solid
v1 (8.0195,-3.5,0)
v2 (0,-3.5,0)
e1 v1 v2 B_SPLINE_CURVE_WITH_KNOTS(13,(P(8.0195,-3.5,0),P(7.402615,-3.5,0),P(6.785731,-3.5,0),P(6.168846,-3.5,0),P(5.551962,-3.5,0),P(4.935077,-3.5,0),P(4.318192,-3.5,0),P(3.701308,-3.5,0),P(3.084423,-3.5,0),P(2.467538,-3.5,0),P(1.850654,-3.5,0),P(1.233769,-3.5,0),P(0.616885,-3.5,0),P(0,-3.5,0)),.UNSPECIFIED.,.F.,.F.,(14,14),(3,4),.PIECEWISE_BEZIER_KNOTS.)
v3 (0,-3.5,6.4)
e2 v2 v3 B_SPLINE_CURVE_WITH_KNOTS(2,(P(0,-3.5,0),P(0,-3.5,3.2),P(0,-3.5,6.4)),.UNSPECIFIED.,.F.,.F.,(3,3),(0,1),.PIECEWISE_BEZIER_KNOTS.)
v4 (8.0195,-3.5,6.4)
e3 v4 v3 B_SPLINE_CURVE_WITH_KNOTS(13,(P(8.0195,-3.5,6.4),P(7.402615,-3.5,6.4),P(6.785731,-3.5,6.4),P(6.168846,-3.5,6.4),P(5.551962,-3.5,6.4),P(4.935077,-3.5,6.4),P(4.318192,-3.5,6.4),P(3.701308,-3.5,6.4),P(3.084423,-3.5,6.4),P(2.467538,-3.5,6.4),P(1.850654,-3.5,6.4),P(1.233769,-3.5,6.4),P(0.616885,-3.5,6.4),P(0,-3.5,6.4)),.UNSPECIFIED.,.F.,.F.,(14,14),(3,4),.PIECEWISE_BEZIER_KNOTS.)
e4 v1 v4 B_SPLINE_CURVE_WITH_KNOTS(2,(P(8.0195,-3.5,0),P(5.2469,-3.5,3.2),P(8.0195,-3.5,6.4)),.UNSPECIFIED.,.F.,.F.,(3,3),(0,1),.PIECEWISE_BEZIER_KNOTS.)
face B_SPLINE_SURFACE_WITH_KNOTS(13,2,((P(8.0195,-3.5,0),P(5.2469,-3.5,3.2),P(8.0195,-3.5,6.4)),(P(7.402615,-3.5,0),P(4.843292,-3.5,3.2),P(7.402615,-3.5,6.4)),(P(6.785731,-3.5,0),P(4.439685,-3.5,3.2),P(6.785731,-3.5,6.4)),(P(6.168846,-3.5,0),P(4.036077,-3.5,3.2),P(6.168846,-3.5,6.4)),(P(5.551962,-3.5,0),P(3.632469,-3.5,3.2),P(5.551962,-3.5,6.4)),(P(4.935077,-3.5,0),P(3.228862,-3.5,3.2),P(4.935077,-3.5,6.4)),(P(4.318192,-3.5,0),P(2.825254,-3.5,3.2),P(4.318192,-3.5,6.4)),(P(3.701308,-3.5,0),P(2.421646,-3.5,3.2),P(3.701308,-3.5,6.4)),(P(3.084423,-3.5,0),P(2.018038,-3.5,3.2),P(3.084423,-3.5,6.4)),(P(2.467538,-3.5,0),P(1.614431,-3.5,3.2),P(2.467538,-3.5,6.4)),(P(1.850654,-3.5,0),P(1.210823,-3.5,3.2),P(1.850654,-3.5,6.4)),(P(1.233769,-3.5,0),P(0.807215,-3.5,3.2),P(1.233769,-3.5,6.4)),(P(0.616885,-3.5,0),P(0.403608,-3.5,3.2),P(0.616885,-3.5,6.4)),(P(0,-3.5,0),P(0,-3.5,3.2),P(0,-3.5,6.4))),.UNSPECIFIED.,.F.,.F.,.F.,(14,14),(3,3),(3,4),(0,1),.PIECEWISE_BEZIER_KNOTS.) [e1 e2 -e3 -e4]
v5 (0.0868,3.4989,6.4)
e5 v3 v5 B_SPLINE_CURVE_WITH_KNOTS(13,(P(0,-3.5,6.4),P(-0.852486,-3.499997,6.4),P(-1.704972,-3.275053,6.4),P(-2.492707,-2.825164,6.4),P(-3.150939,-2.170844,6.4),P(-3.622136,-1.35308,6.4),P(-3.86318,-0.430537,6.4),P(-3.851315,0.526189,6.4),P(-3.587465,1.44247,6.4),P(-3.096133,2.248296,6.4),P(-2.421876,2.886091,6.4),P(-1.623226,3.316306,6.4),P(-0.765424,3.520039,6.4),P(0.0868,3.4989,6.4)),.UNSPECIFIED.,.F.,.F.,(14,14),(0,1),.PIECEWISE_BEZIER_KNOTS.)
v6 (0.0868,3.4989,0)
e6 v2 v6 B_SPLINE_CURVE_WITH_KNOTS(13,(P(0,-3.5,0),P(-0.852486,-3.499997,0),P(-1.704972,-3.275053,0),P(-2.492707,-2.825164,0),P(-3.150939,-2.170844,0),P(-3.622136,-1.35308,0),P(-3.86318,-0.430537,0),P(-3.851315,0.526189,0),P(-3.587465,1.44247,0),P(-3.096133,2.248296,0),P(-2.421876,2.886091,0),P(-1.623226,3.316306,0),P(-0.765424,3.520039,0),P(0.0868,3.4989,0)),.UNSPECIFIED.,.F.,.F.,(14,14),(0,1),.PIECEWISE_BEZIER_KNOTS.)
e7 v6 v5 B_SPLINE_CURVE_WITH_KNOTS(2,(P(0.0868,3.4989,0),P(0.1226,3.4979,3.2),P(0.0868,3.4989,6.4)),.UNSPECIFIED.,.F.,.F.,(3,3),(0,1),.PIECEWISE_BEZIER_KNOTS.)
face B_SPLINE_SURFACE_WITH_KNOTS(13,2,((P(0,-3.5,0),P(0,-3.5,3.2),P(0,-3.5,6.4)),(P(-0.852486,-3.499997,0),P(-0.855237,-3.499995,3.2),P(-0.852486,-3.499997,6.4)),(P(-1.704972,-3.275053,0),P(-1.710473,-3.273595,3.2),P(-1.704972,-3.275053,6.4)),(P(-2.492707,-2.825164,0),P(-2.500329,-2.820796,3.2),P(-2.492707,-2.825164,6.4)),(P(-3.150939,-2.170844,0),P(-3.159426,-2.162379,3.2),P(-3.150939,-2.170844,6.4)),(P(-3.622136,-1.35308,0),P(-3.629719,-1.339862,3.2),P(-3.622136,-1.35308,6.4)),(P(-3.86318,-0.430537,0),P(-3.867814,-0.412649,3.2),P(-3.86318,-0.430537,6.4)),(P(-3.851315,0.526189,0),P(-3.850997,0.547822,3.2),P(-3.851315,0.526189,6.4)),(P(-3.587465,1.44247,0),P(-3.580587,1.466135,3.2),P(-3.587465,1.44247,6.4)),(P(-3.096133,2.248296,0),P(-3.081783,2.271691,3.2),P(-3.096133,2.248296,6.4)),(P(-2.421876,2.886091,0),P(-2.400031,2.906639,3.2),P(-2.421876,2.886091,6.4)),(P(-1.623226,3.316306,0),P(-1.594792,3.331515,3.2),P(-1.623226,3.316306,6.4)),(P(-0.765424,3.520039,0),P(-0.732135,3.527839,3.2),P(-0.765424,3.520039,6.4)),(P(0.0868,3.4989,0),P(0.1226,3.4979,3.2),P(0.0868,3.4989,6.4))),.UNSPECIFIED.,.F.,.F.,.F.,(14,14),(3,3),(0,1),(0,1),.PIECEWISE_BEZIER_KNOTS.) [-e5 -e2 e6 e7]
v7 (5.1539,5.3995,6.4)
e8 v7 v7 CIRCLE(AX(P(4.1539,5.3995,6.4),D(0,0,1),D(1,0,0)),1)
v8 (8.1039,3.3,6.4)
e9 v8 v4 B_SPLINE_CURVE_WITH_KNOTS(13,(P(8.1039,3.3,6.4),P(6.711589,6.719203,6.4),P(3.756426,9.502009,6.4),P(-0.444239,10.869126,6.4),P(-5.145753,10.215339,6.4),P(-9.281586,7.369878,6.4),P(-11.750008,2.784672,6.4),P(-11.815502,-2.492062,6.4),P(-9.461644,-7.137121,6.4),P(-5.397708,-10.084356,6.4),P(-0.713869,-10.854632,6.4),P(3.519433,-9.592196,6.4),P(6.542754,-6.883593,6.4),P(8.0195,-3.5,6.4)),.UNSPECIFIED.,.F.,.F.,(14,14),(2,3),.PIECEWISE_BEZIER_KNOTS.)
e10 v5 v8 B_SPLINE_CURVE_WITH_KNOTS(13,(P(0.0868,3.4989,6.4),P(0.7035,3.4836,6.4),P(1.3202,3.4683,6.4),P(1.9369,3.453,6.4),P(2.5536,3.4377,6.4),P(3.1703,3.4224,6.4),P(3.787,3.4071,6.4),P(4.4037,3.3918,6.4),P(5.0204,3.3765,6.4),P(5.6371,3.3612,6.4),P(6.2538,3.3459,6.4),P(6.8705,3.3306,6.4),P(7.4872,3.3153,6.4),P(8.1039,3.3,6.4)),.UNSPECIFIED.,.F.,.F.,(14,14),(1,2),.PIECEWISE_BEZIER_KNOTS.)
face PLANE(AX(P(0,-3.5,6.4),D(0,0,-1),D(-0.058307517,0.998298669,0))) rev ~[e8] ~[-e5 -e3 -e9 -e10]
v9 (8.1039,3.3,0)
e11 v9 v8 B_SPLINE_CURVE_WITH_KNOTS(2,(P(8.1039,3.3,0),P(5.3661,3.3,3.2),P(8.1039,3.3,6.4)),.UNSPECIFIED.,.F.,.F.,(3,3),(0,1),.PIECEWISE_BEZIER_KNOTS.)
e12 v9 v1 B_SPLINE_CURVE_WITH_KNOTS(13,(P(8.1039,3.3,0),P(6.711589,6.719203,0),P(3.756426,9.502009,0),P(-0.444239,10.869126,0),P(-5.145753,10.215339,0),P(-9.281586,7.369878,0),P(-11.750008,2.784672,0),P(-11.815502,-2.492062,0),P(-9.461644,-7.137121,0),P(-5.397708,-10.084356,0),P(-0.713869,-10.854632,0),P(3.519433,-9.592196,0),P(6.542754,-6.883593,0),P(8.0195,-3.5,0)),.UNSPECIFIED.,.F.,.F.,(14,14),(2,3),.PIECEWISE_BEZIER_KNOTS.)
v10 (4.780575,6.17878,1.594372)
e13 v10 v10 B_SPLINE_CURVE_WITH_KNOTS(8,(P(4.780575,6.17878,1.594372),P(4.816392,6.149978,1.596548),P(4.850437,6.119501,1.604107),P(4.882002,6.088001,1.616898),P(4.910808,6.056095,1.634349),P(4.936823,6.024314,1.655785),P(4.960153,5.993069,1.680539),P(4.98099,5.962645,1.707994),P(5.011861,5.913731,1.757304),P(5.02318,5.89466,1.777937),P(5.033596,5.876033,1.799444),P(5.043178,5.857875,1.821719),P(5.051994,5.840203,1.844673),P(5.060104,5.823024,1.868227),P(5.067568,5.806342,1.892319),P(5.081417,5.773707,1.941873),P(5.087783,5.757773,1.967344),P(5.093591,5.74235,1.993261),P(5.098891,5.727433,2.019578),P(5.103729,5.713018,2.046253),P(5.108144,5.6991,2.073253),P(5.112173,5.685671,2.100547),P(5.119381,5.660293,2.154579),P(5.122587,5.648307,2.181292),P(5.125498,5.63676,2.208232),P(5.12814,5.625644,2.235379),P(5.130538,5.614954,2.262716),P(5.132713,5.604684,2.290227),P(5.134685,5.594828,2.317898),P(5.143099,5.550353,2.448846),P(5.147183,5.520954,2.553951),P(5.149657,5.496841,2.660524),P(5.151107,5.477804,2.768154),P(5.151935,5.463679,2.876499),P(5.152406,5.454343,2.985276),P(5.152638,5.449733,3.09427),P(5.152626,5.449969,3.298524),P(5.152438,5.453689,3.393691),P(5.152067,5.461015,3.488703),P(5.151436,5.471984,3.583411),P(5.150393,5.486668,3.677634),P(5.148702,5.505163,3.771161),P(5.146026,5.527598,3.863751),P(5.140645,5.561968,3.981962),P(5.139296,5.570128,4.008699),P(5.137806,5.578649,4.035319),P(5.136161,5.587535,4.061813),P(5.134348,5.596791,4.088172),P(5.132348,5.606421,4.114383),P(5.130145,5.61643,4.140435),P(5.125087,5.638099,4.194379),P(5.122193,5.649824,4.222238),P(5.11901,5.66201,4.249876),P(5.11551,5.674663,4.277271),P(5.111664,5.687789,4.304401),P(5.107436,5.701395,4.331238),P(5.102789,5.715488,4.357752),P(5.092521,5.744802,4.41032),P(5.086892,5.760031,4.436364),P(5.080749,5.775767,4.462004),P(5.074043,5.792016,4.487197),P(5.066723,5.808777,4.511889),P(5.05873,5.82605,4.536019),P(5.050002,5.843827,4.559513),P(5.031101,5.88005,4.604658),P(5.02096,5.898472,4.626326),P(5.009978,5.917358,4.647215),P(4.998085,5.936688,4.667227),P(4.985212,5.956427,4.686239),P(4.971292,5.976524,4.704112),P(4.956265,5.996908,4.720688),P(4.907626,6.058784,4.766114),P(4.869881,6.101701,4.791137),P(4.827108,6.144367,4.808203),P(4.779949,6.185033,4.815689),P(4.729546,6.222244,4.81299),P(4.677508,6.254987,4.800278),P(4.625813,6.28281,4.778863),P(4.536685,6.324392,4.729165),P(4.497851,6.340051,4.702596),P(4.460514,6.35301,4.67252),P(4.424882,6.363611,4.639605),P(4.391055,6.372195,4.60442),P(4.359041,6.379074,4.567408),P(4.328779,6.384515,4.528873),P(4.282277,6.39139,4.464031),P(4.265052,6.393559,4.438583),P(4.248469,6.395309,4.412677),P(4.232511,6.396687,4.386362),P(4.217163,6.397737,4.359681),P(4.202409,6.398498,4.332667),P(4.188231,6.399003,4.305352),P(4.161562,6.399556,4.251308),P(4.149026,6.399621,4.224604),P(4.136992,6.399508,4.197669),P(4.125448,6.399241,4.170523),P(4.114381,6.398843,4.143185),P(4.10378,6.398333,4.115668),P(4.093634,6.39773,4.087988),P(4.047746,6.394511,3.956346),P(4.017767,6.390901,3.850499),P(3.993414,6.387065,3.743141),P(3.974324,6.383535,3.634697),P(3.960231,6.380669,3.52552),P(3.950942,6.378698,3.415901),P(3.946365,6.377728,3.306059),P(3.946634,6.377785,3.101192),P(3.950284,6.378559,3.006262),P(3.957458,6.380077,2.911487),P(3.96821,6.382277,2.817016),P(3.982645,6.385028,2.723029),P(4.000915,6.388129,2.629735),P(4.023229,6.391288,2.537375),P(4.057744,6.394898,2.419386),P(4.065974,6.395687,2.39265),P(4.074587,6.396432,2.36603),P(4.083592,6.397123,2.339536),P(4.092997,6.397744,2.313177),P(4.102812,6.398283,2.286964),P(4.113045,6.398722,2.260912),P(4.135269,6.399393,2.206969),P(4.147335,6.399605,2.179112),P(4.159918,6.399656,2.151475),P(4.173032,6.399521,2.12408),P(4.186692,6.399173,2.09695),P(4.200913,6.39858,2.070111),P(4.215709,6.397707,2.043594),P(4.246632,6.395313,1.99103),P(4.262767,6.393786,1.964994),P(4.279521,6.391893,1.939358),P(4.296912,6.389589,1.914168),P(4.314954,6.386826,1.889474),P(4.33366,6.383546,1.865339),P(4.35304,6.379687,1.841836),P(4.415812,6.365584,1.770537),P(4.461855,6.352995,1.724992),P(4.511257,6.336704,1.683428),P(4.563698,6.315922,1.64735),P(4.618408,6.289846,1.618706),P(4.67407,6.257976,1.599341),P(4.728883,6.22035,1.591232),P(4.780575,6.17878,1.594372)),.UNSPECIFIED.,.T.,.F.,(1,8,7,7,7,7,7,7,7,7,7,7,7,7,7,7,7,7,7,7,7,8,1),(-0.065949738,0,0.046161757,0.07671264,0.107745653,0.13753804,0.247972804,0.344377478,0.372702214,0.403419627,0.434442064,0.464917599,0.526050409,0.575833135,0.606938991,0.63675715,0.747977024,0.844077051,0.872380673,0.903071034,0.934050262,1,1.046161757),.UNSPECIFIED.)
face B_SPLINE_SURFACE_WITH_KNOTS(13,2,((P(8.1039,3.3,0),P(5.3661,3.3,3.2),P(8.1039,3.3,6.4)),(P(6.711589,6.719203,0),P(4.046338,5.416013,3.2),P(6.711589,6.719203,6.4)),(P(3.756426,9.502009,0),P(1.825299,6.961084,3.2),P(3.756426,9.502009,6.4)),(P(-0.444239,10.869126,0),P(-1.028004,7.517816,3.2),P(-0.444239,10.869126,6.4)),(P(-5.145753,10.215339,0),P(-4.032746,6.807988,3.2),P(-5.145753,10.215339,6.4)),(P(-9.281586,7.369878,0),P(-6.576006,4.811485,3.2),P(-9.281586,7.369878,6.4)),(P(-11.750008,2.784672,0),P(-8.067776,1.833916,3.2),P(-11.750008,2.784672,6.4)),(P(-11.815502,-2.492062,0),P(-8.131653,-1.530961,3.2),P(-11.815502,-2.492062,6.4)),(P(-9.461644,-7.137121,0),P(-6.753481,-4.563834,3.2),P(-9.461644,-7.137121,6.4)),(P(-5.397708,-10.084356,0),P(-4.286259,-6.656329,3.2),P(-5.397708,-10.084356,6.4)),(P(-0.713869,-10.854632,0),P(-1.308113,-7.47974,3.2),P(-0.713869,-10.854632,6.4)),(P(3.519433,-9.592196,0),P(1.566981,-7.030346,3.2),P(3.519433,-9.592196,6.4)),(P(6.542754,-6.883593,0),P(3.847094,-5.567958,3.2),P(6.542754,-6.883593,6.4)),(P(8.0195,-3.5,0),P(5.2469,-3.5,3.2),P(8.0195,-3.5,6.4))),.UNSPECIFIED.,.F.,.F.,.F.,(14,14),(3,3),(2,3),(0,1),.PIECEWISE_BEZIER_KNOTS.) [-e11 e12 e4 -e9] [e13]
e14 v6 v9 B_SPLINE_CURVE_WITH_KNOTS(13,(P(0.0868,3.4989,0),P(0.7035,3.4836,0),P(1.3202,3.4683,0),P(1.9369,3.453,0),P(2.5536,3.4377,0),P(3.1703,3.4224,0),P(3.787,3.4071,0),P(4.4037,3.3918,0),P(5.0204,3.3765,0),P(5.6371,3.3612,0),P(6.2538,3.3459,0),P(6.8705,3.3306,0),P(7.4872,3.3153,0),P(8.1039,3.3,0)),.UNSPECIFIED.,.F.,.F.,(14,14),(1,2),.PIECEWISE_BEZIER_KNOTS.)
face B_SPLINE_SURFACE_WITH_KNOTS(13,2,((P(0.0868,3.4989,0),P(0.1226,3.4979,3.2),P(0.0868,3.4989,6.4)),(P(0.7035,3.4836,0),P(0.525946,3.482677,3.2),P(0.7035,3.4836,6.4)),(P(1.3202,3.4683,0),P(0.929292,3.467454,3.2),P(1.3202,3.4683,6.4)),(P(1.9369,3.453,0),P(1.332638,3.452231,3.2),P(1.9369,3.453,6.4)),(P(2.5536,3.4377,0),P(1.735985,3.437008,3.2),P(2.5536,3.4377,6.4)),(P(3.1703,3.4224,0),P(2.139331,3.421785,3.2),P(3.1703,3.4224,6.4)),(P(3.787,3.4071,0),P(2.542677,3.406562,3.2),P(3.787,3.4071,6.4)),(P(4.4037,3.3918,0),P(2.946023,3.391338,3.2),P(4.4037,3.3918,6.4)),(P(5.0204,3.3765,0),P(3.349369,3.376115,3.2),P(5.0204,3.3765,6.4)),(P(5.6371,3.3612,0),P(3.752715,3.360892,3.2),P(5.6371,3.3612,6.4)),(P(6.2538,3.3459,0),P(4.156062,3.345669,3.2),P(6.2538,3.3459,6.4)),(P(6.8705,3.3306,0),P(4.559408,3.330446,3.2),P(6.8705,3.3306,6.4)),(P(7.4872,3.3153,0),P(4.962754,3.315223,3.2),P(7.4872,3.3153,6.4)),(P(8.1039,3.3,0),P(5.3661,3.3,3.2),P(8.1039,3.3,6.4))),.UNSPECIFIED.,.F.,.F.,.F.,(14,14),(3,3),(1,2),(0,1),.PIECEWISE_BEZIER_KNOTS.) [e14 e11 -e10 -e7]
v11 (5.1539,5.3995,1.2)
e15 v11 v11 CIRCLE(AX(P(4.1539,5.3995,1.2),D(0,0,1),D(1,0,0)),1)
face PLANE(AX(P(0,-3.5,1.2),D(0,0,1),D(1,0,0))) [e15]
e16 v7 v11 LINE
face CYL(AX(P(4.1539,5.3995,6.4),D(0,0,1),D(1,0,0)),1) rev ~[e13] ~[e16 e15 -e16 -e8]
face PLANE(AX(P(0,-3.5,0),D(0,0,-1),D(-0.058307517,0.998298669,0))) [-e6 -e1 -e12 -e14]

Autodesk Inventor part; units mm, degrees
ref_plane "YZ Plane" through (0, 0, 0) normal (1, 0, 0) x (0, 1, 0)
ref_plane "XZ Plane" through (0, 0, 0) normal (0, 1, 0) x (-1, 0, 0)
sketch "Sketch1" plane through (0, 0, 0) normal (0, 0, 1) x (1, 0, 0)
  arc A0 (0.0868, 3.4989) -> (0, -3.5) centre (0, 0) ccw
  arc A1 (8.1039, 3.3) -> (8.0195, -3.5) centre (0, 0) ccw
  line L0 (0.0868, 3.4989) -> (8.1039, 3.3)
  line L1 (0, -3.5) -> (8.0195, -3.5)
  dimension "d0" = 7
  dimension "d1" = 17.5
  dimension "d2" = 3.3
ref_plane "Work Plane1" through (0, 0, 3.2) normal (0, 0, 1) x (1, 0, 0)
sketch "Sketch2" plane through (0, 0, 3.2) normal (0, 0, 1) x (1, 0, 0)
  arc A0 (6.735, 3.3) -> (6.6332, -3.5) centre (0, 0) ccw
  arc A1 (0.1047, 3.4984) -> (0, -3.5) centre (0, 0) ccw
  line L0 (0.1047, 3.4984) -> (6.735, 3.3)
  line L1 (0, -3.5) -> (6.6332, -3.5)
  dimension "d4" = 15
  dimension "d5" = 7
  dimension "d6" = 3.3
ref_plane "Work Plane2" through (0, 0, 6.4) normal (0, 0, 1) x (1, 0, 0)
sketch "Sketch3" plane through (0, 0, 6.4) normal (0, 0, 1) x (1, 0, 0)
  arc A0 (8.1039, 3.3) -> (8.0195, -3.5) centre (0, 0) ccw
  arc A1 (0.0868, 3.4989) -> (0, -3.5) centre (0, 0) ccw
  line L0 (0.0868, 3.4989) -> (8.1039, 3.3)
  line L1 (0, -3.5) -> (8.0195, -3.5)
  dimension "d8" = 17.5
  dimension "d9" = 7
  dimension "d10" = 3.3
loft "Loft1" add profiles "Sketch1", "Sketch2", "Sketch3"
sketch "Sketch4" plane through (0, -3.5, 6.4) normal (0, 0, 1) x (1, 0, 0)
  circle A0 centre (4.1539, 8.8995) radius 1
  line L0 (8.1039, 6.8) -> (0.0868, 6.9989) projected
  point P0 (0, 3.5)
  point P1 (4.0953, 6.8995)
  dimension "d17" = 2
  dimension "d18" = 2
  dimension "d19" = 3.95
extrude "Extrusion1" cut sketch "Sketch4" against normal blind 5.2
properties part number "sg90_shaft_support"
